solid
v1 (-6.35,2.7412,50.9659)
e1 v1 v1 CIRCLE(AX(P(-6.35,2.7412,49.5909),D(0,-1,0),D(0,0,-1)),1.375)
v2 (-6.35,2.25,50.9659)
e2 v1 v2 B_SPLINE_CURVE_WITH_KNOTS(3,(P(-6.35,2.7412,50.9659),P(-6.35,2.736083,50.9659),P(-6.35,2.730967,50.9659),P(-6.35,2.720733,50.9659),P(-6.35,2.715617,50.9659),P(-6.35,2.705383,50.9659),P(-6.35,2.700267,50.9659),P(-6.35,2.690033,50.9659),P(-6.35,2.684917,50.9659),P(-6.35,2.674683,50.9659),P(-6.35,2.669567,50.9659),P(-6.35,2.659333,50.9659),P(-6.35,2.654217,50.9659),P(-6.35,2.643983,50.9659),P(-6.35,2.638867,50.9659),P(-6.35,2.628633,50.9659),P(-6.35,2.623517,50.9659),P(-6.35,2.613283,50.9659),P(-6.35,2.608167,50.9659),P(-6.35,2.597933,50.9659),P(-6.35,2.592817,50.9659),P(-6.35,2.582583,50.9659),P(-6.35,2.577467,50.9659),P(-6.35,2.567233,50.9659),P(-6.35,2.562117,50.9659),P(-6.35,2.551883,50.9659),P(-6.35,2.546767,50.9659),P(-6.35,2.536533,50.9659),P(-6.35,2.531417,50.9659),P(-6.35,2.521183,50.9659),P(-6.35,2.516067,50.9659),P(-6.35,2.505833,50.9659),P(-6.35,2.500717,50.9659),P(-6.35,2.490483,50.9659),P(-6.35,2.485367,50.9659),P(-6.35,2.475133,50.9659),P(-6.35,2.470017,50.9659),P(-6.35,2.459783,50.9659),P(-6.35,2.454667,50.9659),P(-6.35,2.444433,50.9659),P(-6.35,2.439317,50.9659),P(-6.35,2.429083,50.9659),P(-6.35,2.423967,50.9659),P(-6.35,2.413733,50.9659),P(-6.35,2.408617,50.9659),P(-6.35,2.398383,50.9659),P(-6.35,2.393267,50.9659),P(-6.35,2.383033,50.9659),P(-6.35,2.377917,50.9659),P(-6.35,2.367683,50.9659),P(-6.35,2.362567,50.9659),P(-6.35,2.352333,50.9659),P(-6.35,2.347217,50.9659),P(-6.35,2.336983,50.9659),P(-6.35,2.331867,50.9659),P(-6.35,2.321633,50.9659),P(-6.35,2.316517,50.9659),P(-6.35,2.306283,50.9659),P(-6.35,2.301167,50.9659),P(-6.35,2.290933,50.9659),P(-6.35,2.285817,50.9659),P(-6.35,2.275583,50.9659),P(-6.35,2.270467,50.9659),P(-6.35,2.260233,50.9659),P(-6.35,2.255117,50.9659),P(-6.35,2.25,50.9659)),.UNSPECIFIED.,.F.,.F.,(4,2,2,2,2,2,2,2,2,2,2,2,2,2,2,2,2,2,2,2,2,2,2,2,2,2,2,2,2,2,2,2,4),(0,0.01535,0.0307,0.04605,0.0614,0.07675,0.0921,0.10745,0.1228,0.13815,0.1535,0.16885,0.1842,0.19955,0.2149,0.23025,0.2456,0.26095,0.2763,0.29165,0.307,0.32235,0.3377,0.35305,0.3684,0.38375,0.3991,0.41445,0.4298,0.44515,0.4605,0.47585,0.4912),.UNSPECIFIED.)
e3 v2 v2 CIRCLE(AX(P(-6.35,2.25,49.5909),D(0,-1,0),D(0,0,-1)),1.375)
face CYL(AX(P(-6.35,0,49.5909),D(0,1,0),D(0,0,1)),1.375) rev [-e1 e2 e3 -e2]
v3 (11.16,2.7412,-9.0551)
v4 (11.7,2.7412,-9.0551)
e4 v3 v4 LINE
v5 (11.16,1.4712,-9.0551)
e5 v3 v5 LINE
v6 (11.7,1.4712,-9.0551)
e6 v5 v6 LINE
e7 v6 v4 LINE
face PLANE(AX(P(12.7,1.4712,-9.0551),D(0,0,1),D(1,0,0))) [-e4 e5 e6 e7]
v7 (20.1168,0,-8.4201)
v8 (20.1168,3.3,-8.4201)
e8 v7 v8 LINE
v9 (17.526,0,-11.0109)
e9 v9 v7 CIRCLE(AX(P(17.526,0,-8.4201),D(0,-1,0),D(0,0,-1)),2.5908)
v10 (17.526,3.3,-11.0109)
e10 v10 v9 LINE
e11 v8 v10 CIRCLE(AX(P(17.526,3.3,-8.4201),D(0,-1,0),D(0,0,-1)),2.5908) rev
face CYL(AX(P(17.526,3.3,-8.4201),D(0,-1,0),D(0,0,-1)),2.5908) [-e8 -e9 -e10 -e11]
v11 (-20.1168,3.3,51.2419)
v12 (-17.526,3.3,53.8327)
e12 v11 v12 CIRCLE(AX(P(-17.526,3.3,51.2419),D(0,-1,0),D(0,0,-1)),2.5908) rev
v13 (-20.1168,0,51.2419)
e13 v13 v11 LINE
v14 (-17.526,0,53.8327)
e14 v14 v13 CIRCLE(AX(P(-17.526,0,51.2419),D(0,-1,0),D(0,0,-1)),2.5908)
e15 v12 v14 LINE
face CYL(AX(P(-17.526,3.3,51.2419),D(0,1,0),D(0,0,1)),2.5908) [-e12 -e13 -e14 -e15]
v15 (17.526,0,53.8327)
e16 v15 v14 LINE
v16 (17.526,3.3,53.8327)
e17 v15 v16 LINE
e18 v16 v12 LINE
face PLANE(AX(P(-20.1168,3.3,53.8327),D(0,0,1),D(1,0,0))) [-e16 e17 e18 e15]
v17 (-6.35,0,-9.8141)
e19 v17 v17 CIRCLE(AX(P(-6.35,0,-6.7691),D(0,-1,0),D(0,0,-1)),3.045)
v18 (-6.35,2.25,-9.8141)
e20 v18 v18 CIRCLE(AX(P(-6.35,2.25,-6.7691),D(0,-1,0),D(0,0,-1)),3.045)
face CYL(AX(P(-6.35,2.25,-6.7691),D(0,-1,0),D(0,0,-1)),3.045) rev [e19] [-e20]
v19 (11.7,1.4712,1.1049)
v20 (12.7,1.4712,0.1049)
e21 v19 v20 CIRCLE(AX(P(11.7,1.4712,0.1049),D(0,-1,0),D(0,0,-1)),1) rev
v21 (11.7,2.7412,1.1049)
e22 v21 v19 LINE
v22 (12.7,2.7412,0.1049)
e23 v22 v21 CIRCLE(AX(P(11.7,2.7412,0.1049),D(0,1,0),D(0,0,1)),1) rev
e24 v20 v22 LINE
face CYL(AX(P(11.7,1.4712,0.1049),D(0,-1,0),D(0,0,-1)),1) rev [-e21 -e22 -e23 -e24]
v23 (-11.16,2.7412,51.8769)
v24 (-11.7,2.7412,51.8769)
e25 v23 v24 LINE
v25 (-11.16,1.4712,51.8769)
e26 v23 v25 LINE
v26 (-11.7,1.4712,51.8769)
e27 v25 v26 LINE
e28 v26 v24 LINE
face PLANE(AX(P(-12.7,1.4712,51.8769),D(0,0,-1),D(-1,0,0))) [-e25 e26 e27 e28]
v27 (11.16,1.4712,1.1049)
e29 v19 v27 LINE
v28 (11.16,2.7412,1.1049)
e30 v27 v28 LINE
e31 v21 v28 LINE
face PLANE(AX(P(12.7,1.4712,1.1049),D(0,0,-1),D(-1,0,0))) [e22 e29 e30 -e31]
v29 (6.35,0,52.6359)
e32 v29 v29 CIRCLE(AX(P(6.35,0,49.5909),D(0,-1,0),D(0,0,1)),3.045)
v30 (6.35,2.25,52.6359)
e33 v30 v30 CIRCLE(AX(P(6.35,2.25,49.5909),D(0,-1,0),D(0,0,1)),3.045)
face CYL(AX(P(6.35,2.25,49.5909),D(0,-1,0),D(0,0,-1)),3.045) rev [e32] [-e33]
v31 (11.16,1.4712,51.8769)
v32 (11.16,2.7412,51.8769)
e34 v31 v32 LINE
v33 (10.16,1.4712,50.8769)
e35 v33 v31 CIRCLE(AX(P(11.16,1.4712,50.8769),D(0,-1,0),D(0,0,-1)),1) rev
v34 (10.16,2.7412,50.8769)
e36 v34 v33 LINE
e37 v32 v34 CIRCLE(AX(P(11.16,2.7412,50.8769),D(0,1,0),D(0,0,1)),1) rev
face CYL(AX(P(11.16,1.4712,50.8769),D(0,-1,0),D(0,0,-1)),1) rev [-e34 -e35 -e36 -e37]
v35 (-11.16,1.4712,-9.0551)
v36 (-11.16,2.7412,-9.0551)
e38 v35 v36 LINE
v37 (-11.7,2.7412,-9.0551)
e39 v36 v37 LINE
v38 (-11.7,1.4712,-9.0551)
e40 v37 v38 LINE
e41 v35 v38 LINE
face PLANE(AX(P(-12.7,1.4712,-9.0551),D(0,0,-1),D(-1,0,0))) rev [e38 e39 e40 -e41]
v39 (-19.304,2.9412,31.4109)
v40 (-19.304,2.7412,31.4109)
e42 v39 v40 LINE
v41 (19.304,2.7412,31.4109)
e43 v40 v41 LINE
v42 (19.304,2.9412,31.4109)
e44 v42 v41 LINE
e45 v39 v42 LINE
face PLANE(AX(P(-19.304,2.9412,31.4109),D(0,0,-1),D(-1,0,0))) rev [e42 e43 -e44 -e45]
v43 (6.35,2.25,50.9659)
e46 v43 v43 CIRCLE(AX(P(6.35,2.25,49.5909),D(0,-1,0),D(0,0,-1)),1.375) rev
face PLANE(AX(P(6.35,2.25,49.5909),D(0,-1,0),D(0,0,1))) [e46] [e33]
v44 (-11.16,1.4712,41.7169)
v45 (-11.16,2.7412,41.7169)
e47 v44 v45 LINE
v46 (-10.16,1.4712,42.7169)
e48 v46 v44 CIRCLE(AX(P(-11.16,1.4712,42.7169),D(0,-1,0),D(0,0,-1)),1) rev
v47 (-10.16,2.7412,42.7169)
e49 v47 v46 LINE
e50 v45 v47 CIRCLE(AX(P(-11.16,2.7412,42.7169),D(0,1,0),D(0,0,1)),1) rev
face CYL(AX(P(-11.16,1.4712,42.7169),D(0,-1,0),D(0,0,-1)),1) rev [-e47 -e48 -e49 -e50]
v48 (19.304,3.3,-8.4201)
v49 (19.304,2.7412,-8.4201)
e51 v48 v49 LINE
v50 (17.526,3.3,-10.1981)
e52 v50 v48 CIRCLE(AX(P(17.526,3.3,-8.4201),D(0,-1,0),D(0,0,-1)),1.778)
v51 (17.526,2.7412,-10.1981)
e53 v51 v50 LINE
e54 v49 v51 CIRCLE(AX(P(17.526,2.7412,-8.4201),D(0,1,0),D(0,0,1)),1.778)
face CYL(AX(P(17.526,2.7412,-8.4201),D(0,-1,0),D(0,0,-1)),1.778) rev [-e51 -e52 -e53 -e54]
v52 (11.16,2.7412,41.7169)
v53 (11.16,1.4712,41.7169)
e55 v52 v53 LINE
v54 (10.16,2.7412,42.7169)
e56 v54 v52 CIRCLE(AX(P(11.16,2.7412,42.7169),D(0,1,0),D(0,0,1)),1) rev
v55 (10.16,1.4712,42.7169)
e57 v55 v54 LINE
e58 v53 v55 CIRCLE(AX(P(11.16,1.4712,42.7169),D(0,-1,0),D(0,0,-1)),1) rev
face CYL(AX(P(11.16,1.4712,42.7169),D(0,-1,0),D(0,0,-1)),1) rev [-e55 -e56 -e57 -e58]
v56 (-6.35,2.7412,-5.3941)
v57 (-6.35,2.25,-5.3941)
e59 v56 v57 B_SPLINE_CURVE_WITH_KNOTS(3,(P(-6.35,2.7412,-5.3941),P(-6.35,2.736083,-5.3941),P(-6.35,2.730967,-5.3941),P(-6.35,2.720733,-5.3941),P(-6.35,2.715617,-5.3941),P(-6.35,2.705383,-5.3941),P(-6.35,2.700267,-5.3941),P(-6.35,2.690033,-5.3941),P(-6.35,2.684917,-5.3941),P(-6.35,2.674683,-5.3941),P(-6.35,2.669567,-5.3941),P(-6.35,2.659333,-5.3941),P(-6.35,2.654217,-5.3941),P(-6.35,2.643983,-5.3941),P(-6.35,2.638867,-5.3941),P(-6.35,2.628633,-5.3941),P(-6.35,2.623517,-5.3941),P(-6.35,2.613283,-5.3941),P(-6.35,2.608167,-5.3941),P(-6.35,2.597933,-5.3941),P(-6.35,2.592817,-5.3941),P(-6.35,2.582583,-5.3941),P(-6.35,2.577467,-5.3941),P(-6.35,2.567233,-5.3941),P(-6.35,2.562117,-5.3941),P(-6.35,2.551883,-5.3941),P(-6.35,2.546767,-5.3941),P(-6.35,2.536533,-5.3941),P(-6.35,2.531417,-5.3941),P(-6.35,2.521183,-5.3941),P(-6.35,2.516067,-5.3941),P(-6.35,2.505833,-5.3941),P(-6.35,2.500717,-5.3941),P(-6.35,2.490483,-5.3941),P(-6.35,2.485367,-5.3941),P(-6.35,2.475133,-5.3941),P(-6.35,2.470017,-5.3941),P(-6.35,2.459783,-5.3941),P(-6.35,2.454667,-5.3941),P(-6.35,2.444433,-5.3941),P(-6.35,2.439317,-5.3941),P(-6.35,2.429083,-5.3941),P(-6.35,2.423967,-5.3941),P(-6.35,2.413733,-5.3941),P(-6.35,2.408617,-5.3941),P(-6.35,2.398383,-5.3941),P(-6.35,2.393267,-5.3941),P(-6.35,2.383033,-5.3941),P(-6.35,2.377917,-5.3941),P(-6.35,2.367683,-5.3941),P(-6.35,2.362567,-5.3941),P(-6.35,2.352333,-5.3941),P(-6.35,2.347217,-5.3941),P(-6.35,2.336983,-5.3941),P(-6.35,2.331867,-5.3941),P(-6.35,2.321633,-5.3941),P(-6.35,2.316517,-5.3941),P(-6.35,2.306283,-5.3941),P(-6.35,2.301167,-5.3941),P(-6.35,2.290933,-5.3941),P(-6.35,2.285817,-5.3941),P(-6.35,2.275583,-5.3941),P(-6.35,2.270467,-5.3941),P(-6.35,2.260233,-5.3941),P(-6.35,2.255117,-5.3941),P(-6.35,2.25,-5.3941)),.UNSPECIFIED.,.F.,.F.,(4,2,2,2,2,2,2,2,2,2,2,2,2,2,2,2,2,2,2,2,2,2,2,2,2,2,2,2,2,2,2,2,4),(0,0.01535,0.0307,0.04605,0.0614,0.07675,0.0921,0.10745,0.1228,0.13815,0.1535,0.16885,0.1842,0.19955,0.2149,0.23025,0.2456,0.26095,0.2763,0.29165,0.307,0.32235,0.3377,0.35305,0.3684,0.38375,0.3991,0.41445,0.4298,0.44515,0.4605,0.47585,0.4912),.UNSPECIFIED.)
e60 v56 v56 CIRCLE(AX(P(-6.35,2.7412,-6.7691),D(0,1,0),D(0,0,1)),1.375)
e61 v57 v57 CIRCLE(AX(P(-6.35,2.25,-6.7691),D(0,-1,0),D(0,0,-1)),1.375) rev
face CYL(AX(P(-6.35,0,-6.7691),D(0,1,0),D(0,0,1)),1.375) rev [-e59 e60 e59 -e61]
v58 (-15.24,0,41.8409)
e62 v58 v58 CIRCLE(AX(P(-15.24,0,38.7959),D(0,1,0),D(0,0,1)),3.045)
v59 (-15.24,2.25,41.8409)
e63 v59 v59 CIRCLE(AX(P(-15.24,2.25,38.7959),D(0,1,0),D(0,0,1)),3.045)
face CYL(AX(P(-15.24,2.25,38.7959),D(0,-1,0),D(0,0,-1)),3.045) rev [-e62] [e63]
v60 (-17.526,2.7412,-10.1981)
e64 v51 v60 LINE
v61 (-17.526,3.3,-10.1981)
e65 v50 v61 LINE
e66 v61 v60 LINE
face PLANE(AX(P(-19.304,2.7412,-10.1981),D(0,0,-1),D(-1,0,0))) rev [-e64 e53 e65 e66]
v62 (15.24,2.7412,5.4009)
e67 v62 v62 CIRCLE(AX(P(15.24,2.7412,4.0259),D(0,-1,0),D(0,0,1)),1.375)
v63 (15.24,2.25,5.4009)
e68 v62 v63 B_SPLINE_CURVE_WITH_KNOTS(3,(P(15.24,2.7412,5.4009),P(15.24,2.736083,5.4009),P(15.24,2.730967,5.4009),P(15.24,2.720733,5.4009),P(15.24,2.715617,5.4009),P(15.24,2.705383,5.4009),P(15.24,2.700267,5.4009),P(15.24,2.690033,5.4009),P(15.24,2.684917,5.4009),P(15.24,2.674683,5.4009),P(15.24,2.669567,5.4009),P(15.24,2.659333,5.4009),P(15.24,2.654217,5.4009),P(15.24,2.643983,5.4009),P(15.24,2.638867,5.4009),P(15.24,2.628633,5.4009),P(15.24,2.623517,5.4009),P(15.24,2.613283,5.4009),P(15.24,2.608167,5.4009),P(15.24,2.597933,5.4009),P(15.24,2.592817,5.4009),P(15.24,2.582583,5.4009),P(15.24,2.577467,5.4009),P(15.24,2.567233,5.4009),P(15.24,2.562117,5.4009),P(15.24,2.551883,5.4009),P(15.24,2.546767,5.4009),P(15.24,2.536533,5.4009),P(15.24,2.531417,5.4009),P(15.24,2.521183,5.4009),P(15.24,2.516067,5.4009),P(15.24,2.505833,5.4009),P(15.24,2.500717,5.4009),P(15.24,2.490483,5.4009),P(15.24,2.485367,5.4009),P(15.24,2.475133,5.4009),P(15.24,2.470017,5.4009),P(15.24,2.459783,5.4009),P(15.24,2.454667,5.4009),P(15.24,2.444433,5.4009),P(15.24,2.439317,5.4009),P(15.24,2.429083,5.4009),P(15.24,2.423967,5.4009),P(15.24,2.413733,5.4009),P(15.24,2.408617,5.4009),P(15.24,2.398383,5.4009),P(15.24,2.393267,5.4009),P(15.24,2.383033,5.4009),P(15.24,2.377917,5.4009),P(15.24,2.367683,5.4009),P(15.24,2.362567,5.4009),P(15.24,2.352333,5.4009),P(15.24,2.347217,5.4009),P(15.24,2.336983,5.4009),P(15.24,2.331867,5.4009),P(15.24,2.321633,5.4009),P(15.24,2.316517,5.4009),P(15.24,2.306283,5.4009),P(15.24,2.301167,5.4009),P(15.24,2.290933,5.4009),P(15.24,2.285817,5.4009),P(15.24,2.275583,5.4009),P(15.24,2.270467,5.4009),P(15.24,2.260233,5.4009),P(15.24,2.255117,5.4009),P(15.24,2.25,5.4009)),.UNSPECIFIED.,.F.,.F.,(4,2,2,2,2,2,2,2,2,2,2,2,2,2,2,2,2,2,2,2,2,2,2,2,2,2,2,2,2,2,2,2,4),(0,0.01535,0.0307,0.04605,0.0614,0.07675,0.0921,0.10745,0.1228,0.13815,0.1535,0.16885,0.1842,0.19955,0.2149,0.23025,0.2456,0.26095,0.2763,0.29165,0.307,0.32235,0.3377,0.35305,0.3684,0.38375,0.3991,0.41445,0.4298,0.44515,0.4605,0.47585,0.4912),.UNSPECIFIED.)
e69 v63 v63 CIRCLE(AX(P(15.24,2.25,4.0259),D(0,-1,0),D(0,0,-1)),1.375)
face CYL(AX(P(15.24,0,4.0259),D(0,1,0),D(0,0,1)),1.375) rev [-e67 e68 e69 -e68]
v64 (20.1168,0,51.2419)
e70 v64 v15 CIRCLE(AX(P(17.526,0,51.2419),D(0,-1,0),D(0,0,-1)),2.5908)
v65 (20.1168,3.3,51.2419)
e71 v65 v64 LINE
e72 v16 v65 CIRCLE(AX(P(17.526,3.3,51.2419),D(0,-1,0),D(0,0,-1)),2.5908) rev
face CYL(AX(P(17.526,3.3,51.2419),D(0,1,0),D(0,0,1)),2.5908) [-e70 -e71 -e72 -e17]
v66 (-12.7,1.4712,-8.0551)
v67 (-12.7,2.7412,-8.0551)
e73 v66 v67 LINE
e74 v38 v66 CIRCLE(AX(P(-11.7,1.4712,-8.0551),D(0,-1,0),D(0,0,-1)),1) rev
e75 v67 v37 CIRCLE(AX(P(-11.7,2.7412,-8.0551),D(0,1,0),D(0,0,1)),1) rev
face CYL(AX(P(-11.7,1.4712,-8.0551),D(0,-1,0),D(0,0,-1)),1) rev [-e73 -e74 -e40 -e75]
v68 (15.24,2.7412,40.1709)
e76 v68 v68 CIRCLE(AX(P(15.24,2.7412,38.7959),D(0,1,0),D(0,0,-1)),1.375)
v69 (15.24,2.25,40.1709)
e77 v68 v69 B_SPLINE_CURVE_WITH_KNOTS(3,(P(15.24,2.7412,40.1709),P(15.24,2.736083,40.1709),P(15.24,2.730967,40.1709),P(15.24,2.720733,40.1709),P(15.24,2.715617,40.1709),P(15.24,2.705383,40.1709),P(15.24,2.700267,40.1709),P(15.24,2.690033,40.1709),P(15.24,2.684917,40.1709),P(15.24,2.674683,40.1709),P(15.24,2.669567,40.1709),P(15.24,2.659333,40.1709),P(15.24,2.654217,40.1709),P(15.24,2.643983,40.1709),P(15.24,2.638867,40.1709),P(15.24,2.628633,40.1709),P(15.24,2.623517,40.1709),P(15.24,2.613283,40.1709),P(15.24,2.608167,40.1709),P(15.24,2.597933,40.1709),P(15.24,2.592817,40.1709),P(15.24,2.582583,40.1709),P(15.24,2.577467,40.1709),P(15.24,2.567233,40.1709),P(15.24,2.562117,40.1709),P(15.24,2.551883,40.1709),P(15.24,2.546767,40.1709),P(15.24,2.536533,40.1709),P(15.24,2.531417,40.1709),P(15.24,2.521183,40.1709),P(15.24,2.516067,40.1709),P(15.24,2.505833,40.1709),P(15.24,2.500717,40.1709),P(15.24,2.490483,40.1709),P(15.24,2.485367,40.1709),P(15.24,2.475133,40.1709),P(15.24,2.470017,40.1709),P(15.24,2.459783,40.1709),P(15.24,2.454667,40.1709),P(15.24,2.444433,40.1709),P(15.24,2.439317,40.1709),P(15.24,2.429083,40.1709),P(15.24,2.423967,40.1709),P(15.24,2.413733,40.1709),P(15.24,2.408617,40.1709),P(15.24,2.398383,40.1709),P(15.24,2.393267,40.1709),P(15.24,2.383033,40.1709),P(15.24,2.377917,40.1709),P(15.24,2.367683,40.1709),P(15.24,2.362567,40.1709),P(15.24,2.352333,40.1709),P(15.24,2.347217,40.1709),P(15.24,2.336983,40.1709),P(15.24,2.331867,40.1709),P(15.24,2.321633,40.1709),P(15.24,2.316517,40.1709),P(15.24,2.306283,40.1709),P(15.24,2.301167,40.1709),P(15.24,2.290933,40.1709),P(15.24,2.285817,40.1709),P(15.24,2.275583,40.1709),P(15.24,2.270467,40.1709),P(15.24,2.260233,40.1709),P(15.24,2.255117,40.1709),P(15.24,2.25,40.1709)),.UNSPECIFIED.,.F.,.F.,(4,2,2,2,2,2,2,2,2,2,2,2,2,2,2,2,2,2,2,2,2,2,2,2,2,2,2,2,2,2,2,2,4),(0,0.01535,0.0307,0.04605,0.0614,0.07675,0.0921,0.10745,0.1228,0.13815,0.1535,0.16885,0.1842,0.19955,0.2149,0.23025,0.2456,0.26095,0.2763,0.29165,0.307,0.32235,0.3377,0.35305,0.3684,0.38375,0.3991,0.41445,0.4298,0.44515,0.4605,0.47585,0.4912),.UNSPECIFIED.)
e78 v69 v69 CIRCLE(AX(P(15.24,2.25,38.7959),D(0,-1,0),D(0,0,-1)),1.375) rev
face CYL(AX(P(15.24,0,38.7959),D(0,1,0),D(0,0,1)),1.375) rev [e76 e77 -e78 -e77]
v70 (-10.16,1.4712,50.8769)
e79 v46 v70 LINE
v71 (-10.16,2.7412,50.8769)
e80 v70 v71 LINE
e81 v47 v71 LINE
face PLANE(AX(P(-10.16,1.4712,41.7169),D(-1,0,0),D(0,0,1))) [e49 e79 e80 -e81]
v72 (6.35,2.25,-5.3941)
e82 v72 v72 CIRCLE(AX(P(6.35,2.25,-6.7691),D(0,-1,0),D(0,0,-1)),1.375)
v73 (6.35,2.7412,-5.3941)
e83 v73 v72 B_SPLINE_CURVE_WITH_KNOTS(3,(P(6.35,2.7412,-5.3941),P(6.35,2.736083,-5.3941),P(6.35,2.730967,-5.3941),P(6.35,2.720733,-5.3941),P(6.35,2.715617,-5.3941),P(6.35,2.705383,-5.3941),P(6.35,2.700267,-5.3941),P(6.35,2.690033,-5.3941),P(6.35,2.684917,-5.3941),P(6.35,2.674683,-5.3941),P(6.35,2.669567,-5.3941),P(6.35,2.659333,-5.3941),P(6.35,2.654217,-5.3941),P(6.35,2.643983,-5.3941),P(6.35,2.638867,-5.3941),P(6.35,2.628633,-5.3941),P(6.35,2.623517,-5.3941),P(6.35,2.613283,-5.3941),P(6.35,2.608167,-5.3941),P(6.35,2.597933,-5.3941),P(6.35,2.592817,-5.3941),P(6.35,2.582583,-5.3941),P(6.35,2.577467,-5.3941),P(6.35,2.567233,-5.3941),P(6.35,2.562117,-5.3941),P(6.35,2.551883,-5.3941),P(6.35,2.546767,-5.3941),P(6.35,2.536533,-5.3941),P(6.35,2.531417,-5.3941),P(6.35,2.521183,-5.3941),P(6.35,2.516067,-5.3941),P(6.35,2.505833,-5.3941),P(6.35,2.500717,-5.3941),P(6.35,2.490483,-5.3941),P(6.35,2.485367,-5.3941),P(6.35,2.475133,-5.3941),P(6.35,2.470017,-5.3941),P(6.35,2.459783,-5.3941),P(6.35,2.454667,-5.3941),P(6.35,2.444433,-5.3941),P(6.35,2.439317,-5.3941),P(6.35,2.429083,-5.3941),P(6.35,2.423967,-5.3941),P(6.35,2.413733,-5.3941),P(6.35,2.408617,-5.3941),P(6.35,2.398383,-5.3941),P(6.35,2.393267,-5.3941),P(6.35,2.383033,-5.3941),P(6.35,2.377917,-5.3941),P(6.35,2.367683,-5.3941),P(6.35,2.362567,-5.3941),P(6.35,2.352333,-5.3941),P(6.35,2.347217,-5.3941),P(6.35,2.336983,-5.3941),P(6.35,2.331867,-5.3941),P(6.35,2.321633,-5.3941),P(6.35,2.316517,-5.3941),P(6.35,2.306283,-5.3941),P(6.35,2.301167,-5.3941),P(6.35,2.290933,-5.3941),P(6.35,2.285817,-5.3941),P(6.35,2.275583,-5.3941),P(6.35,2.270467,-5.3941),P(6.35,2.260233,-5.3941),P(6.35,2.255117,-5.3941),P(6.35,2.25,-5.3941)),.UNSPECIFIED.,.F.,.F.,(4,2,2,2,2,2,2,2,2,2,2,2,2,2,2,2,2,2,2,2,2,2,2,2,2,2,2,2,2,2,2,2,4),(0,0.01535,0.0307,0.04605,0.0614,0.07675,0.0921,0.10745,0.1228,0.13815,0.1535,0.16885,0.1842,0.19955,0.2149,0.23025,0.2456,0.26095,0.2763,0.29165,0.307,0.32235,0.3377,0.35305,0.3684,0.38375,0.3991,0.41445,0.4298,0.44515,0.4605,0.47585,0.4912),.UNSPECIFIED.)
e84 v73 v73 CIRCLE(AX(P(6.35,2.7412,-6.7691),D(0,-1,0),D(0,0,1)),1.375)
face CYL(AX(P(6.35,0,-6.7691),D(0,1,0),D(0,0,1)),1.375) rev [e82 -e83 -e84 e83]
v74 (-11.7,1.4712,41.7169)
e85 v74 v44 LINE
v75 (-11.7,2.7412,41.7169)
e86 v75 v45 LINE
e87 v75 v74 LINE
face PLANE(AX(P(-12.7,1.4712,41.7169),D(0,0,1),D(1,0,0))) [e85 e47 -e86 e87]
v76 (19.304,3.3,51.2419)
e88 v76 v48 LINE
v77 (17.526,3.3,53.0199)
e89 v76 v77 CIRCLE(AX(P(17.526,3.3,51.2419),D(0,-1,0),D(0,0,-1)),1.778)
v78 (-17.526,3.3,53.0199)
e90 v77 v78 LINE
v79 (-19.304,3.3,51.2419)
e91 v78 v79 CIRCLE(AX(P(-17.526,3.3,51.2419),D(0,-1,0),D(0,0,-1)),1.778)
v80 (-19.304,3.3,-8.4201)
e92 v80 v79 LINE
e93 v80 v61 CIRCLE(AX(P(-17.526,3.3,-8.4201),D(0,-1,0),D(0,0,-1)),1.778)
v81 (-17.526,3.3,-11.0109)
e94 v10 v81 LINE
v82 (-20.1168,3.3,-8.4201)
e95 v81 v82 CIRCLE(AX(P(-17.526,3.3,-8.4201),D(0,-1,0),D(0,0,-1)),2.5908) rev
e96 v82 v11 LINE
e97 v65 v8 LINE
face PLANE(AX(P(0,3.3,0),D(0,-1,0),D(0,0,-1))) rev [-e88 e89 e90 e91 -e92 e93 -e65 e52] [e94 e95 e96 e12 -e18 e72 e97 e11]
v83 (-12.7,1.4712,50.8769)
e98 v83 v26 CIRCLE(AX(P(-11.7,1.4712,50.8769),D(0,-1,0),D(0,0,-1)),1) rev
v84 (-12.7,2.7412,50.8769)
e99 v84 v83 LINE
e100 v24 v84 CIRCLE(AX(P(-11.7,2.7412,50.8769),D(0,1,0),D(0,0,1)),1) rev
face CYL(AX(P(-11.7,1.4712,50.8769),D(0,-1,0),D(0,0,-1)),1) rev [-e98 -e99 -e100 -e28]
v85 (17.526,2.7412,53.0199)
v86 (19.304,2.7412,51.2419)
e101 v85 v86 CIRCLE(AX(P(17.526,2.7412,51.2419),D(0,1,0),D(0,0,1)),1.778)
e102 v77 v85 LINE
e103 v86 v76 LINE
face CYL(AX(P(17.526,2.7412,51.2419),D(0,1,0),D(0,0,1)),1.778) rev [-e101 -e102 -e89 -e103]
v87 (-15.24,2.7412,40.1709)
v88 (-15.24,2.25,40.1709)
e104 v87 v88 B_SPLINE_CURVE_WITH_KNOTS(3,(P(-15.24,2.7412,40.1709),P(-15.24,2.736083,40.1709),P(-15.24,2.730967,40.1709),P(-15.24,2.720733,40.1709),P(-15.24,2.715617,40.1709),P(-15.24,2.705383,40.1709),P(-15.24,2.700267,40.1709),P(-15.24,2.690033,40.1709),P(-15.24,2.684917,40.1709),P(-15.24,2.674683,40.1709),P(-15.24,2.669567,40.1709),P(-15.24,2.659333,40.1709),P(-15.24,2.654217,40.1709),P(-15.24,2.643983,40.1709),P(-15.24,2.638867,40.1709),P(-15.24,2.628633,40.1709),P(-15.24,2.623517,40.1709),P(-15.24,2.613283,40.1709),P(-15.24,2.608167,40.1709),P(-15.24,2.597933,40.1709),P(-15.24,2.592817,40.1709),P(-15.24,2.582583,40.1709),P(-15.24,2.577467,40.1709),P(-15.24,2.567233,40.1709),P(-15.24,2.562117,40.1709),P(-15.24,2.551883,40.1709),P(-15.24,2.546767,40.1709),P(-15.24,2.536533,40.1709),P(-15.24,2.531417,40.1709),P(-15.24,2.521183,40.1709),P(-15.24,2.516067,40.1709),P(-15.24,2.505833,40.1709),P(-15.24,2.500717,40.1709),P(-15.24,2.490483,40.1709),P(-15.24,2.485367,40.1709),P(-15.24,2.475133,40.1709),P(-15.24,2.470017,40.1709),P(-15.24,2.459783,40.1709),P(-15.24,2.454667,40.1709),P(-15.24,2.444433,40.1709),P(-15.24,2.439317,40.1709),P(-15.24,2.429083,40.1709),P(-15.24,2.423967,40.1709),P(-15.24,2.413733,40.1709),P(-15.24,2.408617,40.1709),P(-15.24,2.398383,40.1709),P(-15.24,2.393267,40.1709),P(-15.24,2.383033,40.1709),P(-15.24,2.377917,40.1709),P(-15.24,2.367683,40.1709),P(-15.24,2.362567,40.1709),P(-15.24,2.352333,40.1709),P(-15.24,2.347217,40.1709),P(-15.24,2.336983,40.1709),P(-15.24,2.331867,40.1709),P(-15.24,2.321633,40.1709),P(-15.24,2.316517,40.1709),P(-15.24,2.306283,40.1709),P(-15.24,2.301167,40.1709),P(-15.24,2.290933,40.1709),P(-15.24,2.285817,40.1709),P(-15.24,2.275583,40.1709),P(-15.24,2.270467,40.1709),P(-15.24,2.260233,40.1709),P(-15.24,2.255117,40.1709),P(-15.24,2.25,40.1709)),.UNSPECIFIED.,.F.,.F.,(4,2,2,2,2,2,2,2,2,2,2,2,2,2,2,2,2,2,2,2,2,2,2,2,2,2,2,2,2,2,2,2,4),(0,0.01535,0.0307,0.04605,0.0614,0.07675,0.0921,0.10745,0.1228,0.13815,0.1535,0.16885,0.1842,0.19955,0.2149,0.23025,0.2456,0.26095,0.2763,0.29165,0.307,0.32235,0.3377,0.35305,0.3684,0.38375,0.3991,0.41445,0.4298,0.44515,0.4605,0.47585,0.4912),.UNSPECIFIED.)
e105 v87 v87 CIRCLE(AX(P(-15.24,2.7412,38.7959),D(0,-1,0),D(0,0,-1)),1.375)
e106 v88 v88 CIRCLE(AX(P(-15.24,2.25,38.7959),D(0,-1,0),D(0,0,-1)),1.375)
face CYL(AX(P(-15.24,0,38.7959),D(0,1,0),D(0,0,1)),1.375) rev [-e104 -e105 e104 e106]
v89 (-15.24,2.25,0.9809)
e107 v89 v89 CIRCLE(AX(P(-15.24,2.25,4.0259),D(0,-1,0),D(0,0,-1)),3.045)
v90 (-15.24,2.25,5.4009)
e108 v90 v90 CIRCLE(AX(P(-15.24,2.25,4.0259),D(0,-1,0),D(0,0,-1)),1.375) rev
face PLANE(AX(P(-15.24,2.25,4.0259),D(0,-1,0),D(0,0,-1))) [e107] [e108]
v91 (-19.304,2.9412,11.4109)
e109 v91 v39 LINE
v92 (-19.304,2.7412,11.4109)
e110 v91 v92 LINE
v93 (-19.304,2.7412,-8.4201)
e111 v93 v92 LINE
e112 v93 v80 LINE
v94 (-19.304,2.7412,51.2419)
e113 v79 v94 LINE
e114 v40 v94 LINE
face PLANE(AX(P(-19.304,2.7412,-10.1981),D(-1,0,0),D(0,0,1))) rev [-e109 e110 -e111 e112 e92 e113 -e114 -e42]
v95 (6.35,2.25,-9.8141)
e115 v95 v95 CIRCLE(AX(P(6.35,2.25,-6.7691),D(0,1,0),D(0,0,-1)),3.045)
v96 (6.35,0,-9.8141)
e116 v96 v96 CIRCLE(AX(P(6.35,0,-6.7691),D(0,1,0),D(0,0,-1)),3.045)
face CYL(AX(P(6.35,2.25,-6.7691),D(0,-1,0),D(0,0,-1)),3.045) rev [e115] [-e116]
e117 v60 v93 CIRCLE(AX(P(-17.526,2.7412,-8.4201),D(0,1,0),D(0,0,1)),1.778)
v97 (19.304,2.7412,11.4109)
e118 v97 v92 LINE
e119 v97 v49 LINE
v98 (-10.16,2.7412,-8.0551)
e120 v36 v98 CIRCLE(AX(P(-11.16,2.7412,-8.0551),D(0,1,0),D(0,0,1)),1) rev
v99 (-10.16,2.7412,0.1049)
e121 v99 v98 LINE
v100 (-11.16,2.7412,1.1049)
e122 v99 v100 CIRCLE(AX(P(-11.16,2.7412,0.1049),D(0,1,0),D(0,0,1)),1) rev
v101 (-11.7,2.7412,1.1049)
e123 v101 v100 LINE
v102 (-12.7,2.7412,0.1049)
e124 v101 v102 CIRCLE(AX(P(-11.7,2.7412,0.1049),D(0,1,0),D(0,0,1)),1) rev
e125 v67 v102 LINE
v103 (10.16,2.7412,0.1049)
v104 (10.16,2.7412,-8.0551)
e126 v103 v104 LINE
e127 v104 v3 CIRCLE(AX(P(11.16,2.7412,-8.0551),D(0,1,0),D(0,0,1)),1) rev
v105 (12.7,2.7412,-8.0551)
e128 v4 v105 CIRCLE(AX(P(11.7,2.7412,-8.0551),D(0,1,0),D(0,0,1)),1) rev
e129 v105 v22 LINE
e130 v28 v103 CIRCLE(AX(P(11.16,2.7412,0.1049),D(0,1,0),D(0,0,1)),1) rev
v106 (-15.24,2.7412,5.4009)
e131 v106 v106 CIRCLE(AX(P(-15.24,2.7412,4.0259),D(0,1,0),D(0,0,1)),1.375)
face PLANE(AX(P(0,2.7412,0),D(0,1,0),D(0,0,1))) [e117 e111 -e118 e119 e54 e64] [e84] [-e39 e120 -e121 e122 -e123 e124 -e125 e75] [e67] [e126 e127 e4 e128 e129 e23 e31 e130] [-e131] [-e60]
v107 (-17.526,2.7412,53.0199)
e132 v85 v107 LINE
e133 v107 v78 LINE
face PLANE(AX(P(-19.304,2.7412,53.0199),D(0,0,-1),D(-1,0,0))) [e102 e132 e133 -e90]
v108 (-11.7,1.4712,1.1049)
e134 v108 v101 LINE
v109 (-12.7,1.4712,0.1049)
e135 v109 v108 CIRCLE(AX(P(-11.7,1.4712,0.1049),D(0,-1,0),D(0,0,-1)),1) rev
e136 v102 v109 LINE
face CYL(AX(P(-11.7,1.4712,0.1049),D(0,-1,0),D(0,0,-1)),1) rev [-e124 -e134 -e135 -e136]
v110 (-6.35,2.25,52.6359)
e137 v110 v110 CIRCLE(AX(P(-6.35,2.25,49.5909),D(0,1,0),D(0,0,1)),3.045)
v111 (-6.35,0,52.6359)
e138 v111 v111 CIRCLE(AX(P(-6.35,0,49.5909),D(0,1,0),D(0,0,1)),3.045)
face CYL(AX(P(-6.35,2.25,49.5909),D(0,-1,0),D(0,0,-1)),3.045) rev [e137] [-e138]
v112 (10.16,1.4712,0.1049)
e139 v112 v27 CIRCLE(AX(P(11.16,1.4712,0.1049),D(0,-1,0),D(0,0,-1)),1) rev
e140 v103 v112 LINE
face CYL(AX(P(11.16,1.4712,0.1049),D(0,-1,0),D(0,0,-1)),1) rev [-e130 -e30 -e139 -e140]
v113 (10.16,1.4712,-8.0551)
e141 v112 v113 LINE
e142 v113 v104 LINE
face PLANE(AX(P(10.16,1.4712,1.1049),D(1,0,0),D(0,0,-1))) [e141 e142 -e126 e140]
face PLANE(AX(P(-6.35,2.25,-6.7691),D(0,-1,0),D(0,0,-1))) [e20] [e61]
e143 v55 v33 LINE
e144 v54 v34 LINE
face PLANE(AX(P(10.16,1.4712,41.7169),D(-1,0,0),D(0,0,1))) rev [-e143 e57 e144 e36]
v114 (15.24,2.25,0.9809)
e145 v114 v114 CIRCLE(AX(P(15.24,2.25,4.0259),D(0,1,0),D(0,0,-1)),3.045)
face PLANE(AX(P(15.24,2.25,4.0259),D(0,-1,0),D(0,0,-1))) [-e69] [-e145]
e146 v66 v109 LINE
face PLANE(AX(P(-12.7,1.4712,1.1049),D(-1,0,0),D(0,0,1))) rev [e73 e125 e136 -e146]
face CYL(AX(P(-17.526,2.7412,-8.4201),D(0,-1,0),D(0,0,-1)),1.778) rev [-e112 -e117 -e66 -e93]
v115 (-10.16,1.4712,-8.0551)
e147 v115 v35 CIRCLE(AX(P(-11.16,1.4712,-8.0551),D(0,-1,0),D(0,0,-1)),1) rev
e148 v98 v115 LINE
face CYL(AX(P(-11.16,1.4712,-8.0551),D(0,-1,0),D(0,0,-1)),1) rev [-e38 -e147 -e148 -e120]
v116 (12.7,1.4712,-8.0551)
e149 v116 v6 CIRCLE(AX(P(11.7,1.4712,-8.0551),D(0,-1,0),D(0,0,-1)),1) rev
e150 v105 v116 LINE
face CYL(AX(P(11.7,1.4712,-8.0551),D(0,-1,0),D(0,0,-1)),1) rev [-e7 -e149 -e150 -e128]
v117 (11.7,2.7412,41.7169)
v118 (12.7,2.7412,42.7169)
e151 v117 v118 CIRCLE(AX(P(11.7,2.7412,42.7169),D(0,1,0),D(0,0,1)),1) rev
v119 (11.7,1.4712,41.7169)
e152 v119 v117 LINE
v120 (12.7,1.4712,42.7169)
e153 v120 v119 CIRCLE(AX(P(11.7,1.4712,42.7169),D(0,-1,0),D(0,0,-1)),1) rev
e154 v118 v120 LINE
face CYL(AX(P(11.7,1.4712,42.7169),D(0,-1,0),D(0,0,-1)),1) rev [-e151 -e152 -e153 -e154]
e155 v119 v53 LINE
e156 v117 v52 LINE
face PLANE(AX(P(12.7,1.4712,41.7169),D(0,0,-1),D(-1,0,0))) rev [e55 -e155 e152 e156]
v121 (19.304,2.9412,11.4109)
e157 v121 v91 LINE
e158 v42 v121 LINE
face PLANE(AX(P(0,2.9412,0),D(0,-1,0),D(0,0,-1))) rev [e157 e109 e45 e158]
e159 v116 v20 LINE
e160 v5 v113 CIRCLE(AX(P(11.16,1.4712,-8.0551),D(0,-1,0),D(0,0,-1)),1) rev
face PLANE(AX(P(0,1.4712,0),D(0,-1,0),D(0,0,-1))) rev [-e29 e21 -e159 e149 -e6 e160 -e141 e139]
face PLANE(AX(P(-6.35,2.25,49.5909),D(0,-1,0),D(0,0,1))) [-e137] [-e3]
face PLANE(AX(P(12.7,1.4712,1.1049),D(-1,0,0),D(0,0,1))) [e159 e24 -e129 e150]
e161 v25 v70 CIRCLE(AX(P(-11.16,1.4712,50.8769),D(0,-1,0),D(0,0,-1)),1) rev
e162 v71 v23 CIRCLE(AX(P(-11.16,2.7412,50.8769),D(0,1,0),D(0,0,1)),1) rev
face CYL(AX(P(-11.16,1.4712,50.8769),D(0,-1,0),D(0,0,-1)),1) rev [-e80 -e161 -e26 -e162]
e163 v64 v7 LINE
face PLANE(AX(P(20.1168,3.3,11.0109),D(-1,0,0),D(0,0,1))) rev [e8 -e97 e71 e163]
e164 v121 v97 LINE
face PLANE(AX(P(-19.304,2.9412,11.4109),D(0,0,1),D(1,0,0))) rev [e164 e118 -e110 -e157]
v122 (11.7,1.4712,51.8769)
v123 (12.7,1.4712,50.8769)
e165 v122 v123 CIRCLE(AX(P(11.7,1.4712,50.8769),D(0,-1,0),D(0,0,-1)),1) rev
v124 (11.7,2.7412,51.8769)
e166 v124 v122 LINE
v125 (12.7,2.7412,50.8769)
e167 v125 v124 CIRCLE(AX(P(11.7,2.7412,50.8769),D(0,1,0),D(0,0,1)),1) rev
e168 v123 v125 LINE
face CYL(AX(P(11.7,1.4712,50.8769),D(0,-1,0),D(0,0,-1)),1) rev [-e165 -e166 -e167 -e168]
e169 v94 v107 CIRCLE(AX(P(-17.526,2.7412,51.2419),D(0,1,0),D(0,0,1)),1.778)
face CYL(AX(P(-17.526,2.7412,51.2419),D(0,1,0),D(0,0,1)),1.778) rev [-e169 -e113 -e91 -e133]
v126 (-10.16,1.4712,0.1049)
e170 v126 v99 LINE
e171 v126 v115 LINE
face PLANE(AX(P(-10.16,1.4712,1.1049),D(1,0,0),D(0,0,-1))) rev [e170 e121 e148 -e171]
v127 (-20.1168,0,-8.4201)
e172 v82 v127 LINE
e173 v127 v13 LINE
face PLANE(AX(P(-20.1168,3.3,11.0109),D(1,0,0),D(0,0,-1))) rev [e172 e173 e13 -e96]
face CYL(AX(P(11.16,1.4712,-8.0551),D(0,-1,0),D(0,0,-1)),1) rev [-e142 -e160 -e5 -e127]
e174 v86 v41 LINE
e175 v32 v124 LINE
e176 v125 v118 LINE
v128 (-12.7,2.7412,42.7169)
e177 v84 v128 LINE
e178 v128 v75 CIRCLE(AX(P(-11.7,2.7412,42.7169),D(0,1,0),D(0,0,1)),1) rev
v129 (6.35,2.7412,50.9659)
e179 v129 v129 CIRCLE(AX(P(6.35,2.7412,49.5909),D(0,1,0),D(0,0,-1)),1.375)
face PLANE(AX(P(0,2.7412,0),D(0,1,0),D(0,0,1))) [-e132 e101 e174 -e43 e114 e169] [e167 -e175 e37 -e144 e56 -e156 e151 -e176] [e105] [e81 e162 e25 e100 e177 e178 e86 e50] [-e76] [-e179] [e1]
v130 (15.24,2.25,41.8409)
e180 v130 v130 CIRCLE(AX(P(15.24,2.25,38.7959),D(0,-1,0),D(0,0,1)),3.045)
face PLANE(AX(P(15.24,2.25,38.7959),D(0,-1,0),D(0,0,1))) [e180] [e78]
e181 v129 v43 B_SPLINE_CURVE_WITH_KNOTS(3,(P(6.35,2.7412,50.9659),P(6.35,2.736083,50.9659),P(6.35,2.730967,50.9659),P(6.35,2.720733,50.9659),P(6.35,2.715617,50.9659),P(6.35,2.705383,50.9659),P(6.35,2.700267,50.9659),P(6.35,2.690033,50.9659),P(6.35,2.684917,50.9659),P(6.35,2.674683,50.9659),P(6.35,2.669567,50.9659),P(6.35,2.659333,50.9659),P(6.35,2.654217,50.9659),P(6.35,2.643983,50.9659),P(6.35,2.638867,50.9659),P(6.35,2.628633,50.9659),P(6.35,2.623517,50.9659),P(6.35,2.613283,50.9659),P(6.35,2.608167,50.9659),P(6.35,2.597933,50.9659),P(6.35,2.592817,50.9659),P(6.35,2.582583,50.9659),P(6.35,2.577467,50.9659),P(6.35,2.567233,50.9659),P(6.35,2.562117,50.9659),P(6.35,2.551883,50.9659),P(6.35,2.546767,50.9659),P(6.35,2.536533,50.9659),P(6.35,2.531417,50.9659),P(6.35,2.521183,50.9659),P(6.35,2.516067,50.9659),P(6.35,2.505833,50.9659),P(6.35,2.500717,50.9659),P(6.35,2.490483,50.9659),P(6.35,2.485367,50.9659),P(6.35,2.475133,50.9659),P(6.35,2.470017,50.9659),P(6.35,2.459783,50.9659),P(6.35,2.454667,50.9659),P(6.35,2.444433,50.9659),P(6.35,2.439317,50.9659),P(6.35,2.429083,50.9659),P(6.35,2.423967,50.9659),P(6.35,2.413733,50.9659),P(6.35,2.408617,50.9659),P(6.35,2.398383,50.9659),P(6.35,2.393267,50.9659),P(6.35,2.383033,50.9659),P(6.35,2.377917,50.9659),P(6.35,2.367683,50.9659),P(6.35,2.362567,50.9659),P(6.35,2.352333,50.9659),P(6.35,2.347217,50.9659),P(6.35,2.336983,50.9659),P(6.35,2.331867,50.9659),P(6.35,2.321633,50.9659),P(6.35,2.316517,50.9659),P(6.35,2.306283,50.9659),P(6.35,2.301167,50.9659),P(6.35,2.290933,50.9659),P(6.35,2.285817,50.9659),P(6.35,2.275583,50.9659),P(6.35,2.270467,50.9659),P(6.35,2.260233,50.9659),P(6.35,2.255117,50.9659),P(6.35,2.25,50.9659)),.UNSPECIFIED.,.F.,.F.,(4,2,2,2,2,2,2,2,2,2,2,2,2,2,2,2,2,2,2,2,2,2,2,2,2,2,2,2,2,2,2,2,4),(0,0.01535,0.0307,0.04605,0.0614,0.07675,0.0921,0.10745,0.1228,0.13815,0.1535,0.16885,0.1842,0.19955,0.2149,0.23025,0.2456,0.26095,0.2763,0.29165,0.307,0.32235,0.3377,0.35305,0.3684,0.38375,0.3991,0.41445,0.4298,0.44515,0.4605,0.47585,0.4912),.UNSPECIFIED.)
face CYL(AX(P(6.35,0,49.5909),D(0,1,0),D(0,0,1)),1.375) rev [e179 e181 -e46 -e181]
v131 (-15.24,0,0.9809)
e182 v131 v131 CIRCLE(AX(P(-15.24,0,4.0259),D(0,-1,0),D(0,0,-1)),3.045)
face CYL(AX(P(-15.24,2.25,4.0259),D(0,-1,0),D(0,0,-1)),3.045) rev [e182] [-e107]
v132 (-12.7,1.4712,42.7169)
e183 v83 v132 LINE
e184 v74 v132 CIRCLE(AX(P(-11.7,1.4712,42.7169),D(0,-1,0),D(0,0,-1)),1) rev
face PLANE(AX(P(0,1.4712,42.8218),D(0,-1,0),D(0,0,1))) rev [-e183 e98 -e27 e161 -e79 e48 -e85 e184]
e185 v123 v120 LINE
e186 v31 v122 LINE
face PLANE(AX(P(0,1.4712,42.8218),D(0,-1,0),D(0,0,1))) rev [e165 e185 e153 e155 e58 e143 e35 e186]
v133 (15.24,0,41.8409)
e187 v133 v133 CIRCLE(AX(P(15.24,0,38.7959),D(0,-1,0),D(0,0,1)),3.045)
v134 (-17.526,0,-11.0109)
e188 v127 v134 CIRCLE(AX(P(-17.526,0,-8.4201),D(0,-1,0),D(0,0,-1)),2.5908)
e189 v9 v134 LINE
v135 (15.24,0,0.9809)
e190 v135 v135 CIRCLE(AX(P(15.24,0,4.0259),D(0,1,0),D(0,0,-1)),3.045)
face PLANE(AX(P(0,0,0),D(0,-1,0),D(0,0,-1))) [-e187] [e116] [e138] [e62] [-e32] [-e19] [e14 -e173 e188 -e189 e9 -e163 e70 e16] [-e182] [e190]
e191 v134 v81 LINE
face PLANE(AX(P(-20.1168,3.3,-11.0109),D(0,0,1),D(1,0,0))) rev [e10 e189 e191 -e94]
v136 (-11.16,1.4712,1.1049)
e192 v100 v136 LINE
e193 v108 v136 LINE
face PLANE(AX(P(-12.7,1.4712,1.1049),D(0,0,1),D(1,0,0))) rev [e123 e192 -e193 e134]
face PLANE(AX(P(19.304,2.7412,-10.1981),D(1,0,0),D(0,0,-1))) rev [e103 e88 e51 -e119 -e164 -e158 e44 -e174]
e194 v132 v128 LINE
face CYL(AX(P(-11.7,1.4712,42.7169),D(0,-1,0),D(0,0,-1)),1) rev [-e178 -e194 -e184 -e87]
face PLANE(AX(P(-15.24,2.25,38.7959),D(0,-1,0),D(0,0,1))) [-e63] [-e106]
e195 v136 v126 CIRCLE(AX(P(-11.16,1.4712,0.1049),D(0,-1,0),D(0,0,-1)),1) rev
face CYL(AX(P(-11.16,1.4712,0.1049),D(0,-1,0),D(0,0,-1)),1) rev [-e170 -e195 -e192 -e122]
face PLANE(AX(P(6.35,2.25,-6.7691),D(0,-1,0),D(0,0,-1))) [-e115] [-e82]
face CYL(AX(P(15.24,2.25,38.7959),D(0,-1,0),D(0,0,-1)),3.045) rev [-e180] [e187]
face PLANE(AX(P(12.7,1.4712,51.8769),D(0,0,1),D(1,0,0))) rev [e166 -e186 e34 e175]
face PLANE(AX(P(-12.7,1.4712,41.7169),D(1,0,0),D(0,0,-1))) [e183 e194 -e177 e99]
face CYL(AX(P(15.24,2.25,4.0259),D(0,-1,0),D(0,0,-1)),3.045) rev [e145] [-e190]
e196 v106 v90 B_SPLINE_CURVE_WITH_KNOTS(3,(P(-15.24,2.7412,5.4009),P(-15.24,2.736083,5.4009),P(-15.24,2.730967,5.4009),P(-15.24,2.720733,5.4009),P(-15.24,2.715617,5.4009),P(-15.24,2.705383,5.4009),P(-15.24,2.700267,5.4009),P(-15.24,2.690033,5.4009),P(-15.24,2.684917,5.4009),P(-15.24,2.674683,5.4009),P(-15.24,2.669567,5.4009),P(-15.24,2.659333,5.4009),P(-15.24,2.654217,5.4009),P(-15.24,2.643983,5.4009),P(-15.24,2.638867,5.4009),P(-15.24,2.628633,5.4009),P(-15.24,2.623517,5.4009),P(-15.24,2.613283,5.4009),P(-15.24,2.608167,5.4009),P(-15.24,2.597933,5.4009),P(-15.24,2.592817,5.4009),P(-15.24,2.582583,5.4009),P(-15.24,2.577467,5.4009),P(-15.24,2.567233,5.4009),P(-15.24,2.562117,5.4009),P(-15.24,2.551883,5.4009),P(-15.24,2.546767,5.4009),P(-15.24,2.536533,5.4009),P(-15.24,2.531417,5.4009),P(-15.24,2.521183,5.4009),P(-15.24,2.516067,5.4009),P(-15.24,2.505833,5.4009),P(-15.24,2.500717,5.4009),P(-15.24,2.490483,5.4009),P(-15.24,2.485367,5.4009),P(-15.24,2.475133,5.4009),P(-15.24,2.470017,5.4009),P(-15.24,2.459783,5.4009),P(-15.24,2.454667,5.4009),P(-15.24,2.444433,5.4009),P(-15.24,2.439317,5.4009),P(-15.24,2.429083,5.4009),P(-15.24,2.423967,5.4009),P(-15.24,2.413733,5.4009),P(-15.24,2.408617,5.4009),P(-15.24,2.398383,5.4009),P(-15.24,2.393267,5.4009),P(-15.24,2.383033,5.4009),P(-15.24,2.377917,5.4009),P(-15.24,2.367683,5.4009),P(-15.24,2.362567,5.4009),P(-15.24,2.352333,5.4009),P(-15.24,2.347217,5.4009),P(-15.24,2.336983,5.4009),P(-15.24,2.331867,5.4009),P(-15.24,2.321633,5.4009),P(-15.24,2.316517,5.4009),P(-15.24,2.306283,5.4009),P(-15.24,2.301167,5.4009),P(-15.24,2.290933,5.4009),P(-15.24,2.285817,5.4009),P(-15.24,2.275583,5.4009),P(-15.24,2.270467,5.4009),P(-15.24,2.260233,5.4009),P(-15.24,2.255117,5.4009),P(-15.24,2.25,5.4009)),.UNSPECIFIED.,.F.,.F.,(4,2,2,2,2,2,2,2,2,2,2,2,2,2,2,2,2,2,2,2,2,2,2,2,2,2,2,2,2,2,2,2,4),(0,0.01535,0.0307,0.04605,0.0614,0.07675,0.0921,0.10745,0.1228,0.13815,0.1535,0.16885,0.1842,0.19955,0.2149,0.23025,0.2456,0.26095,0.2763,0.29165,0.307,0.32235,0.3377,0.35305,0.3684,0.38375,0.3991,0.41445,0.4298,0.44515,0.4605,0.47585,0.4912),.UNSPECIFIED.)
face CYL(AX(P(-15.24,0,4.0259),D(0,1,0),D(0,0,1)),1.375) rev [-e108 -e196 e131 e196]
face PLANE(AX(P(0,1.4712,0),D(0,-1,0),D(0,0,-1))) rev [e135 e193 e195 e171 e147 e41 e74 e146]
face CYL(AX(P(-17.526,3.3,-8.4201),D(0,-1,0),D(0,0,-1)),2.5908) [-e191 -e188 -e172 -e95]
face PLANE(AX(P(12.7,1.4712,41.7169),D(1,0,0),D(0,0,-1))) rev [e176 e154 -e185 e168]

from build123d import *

# Parameters (mm, degrees)
SKETCH1_W             = 40.2336
SKETCH1_H             = 22.0218
BOSS_EXTRUDE1_DEPTH   = 3.3
FILLET1_R             = 2.5908
SKETCH3_W             = 38.608
SKETCH3_H             = 21.209
CUT_EXTRUDE1_DEPTH    = 0.5588
FILLET2_R             = 1.778
SKETCH4_R             = 1.375
CUT_EXTRUDE2_DEPTH    = 24.096314392
SKETCH5_R             = 3.045
CUT_EXTRUDE3_DEPTH    = 2.25
SKETCH6_W             = 2.54
SKETCH6_H             = 10.16
CUT_EXTRUDE4_DEPTH    = 1.27
FILLET3_R             = 1
FILLET3_OF_MIRROR3_R  = 1
BOSS_EXTRUDE2_DEPTH   = 20.8
SKETCH9_W             = 38.608
SKETCH9_H             = 20
BOSS_EXTRUDE3_DEPTH   = 0.2
MIRROR4_OUTLINE_R     = 3.045
MIRROR4_DEPTH         = 2.7412
MIRROR4_2_DEPTH       = 1.4712
MIRROR4_START         = 2.25
MIRROR4_3_OUTLINE_R   = 3.045
MIRROR4_3_OUTLINE_R_2 = 1.375
MIRROR4_3_DEPTH       = 0.4912
MIRROR4_START_2       = 2.7412
MIRROR4_4_DEPTH       = 0.5588


# Read off the part's stored shape, not the designer's step: Mirror4
with BuildPart() as part:
    # Sketch1 → Boss-Extrude1 (new body)
    with BuildSketch(Plane(origin=(0, 0, 0), x_dir=(1, 0, 0), z_dir=(0, 1, 0))):
        Rectangle(SKETCH1_W, SKETCH1_H)
    extrude(amount=BOSS_EXTRUDE1_DEPTH)

    # Fillet1
    fillet1_edges = [part.edges().sort_by_distance(p)[0] for p in [
        (-20.1168, 1.65, -11.0109),
        (20.1168, 1.65, -11.0109),
    ]]
    fillet(fillet1_edges, radius=FILLET1_R)

    # Sketch3 → Cut-Extrude1 (cut)
    with BuildSketch(Plane(origin=(0, 3.3, 0), x_dir=(1, 0, 0), z_dir=(0, 1, 0))):
        with Locations((0, -0.4064)):
            Rectangle(SKETCH3_W, SKETCH3_H)
    extrude(amount=-CUT_EXTRUDE1_DEPTH, mode=Mode.SUBTRACT)

    # Fillet2
    fillet2_edges = [part.edges().sort_by_distance(p)[0] for p in [
        (19.304, 3.0206, -10.1981),
        (-19.304, 3.0206, -10.1981),
    ]]
    fillet(fillet2_edges, radius=FILLET2_R)

    # Sketch4 → Cut-Extrude2 (cut, through all)
    with BuildSketch(Plane(origin=(0, 2.7412, 0), x_dir=(1, 0, 0), z_dir=(0, 1, 0))):
        with Locations(Location((-6.35, 6.7691, 0), (0, 0, 270))):
            Circle(SKETCH4_R)
        with Locations(Location((-15.24, -4.0259, 0), (0, 0, 270))):
            Circle(SKETCH4_R)
    cut_extrude2 = extrude(amount=-CUT_EXTRUDE2_DEPTH, mode=Mode.SUBTRACT)

    # Mirror1: Cut-Extrude2 across plane
    add(cut_extrude2.mirror(Plane(origin=(0, 0, 0), x_dir=(0, 0, 1), z_dir=(1, 0, 0))), mode=Mode.SUBTRACT)

    # Sketch5 → Cut-Extrude3 (cut)
    with BuildSketch(Plane.XZ):
        with Locations(Location((-15.24, 4.0259, 0), (0, 0, 270))):
            Circle(SKETCH5_R)
        with Locations(Location((-6.35, -6.7691, 0), (0, 0, 270))):
            Circle(SKETCH5_R)
    cut_extrude3 = extrude(amount=-CUT_EXTRUDE3_DEPTH, mode=Mode.SUBTRACT)

    # Mirror2: Cut-Extrude3 across plane
    add(cut_extrude3.mirror(Plane(origin=(0, 0, 0), x_dir=(0, 0, 1), z_dir=(1, 0, 0))), mode=Mode.SUBTRACT)

    # Sketch6 → Cut-Extrude4 (cut)
    with BuildSketch(Plane(origin=(0, 2.7412, 0), x_dir=(1, 0, 0), z_dir=(0, 1, 0))):
        with Locations((-11.43, 3.9751)):
            Rectangle(SKETCH6_W, SKETCH6_H)
    cut_extrude4 = extrude(amount=-CUT_EXTRUDE4_DEPTH, mode=Mode.SUBTRACT)

    # Fillet3
    fillet3_edges = [part.edges().sort_by_distance(p)[0] for p in [
        (-10.16, 2.1062, -9.0551),
        (-10.16, 2.1062, 1.1049),
        (-12.7, 2.1062, 1.1049),
        (-12.7, 2.1062, -9.0551),
    ]]
    fillet(fillet3_edges, radius=FILLET3_R)

    # Mirror3: Cut-Extrude4 across plane
    add(cut_extrude4.mirror(Plane(origin=(0, 0, 0), x_dir=(0, 0, 1), z_dir=(1, 0, 0))), mode=Mode.SUBTRACT)

    # Fillet3 of Mirror3
    fillet3_of_mirror3_edges = [part.edges().sort_by_distance(p)[0] for p in [
        (10.16, 2.1062, -9.0551),
        (10.16, 2.1062, 1.1049),
        (12.7, 2.1062, 1.1049),
        (12.7, 2.1062, -9.0551),
    ]]
    fillet(fillet3_of_mirror3_edges, radius=FILLET3_OF_MIRROR3_R)

    # Sketch8 → Boss-Extrude2 (add)
    with BuildSketch(Plane.XY.offset(11.0109)):
        Polygon((-20.1168, 0), (-20.1168, 3.3), (-19.304, 3.3), (-19.304, 2.7412), (19.304, 2.7412), (19.304, 3.3), (20.1168, 3.3), (20.1168, 0), align=None)
    extrude(amount=BOSS_EXTRUDE2_DEPTH)

    # Sketch9 → Boss-Extrude3 (add)
    with BuildSketch(Plane(origin=(0, 2.7412, 0), x_dir=(1, 0, 0), z_dir=(0, 1, 0))):
        with Locations((0, -21.4109)):
            Rectangle(SKETCH9_W, SKETCH9_H)
    extrude(amount=BOSS_EXTRUDE3_DEPTH)

    # Mirror4 outline → Mirror4 (add)
    with BuildSketch(Plane(origin=(0, 0, 0), x_dir=(1, 0, 0), z_dir=(0, 1, 0))):
        with BuildLine():
            Line((-20.1168, -31.8109), (-20.1168, -51.241899868))
            ThreePointArc((-20.1168, -51.241899868), (-19.357972249, -53.073872117), (-17.526, -53.832699868))
            Line((-17.526, -53.832699868), (17.526, -53.832699868))
            ThreePointArc((17.526, -53.832699868), (19.357972249, -53.073872117), (20.1168, -51.241899868))
            Line((20.1168, -51.241899868), (20.1168, -31.8109))
            Line((20.1168, -31.8109), (-20.1168, -31.8109))
        make_face()
        with Locations((-6.35, -49.590899868)):
            Circle(MIRROR4_OUTLINE_R, mode=Mode.SUBTRACT)
        with BuildLine():
            ThreePointArc((-11.16, -41.716899868), (-10.452893219, -42.009793087), (-10.16, -42.716899868))
            Line((-10.16, -42.716899868), (-10.16, -50.876899868))
            ThreePointArc((-10.16, -50.876899868), (-10.452893219, -51.584006649), (-11.16, -51.876899868))
            Line((-11.16, -51.876899868), (-11.7, -51.876899868))
            ThreePointArc((-11.7, -51.876899868), (-12.407106781, -51.584006649), (-12.7, -50.876899868))
            Line((-12.7, -50.876899868), (-12.7, -42.716899868))
            ThreePointArc((-12.7, -42.716899868), (-12.407106781, -42.009793087), (-11.7, -41.716899868))
            Line((-11.7, -41.716899868), (-11.16, -41.716899868))
        make_face(mode=Mode.SUBTRACT)
        with Locations((6.35, -49.590899868)):
            Circle(MIRROR4_OUTLINE_R, mode=Mode.SUBTRACT)
        with BuildLine():
            Line((10.16, -50.876899868), (10.16, -42.716899868))
            ThreePointArc((10.16, -42.716899868), (10.452893219, -42.009793087), (11.16, -41.716899868))
            Line((11.16, -41.716899868), (11.7, -41.716899868))
            ThreePointArc((11.7, -41.716899868), (12.407106781, -42.009793087), (12.7, -42.716899868))
            Line((12.7, -42.716899868), (12.7, -50.876899868))
            ThreePointArc((12.7, -50.876899868), (12.407106781, -51.584006649), (11.7, -51.876899868))
            Line((11.7, -51.876899868), (11.16, -51.876899868))
            ThreePointArc((11.16, -51.876899868), (10.452893219, -51.584006649), (10.16, -50.876899868))
        make_face(mode=Mode.SUBTRACT)
        with Locations((-15.24, -38.795899868)):
            Circle(MIRROR4_OUTLINE_R, mode=Mode.SUBTRACT)
        with Locations((15.24, -38.795899868)):
            Circle(MIRROR4_OUTLINE_R, mode=Mode.SUBTRACT)
    extrude(amount=MIRROR4_DEPTH)

    # Mirror4 2 outline → Mirror4 2 (add)
    with BuildSketch(Plane(origin=(0, 0, 0), x_dir=(1, 0, 0), z_dir=(0, 1, 0))):
        with BuildLine():
            Line((-10.16, -50.876899868), (-10.16, -42.716899868))
            ThreePointArc((-10.16, -42.716899868), (-10.452893219, -42.009793087), (-11.16, -41.716899868))
            Line((-11.16, -41.716899868), (-11.7, -41.716899868))
            ThreePointArc((-11.7, -41.716899868), (-12.407106781, -42.009793087), (-12.7, -42.716899868))
            Line((-12.7, -42.716899868), (-12.7, -50.876899868))
            ThreePointArc((-12.7, -50.876899868), (-12.407106781, -51.584006649), (-11.7, -51.876899868))
            Line((-11.7, -51.876899868), (-11.16, -51.876899868))
            ThreePointArc((-11.16, -51.876899868), (-10.452893219, -51.584006649), (-10.16, -50.876899868))
        make_face()
        with BuildLine():
            ThreePointArc((11.16, -41.716899868), (10.452893219, -42.009793087), (10.16, -42.716899868))
            Line((10.16, -42.716899868), (10.16, -50.876899868))
            ThreePointArc((10.16, -50.876899868), (10.452893219, -51.584006649), (11.16, -51.876899868))
            Line((11.16, -51.876899868), (11.7, -51.876899868))
            ThreePointArc((11.7, -51.876899868), (12.407106781, -51.584006649), (12.7, -50.876899868))
            Line((12.7, -50.876899868), (12.7, -42.716899868))
            ThreePointArc((12.7, -42.716899868), (12.407106781, -42.009793087), (11.7, -41.716899868))
            Line((11.7, -41.716899868), (11.16, -41.716899868))
        make_face()
    extrude(amount=MIRROR4_2_DEPTH)

    # Mirror4 3 outline → Mirror4 3 (add)
    # profile 1 of 4: a face of its own
    with BuildSketch(Plane(origin=(0, 0, 0), x_dir=(1, 0, 0), z_dir=(0, 1, 0)).offset(MIRROR4_START)):
        with Locations((-6.35, -49.590899868)):
            Circle(MIRROR4_3_OUTLINE_R)
        with Locations((-6.35, -49.590899868)):
            Circle(MIRROR4_3_OUTLINE_R_2, mode=Mode.SUBTRACT)
    # profile 2 of 4: a face of its own
    with BuildSketch(Plane(origin=(0, 0, 0), x_dir=(1, 0, 0), z_dir=(0, 1, 0)).offset(MIRROR4_START)):
        with Locations((-15.24, -38.795899868)):
            Circle(MIRROR4_3_OUTLINE_R)
        with Locations((-15.24, -38.795899868)):
            Circle(MIRROR4_3_OUTLINE_R_2, mode=Mode.SUBTRACT)
    # profile 3 of 4: a face of its own
    with BuildSketch(Plane(origin=(0, 0, 0), x_dir=(1, 0, 0), z_dir=(0, 1, 0)).offset(MIRROR4_START)):
        with Locations((6.35, -49.590899868)):
            Circle(MIRROR4_3_OUTLINE_R)
        with Locations((6.35, -49.590899868)):
            Circle(MIRROR4_3_OUTLINE_R_2, mode=Mode.SUBTRACT)
    # profile 4 of 4: a face of its own
    with BuildSketch(Plane(origin=(0, 0, 0), x_dir=(1, 0, 0), z_dir=(0, 1, 0)).offset(MIRROR4_START)):
        with Locations((15.24, -38.795899868)):
            Circle(MIRROR4_3_OUTLINE_R)
        with Locations((15.24, -38.795899868)):
            Circle(MIRROR4_3_OUTLINE_R_2, mode=Mode.SUBTRACT)
    extrude(amount=MIRROR4_3_DEPTH)

    # Mirror4 4 outline → Mirror4 4 (add)
    with BuildSketch(Plane(origin=(0, 0, 0), x_dir=(1, 0, 0), z_dir=(0, 1, 0)).offset(MIRROR4_START_2)):
        with BuildLine():
            Line((19.304, -31.8109), (19.304, -51.241899868))
            ThreePointArc((19.304, -51.241899868), (18.783235857, -52.499135725), (17.526, -53.019899868))
            Line((17.526, -53.019899868), (-17.526, -53.019899868))
            ThreePointArc((-17.526, -53.019899868), (-18.783235857, -52.499135725), (-19.304, -51.241899868))
            Line((-19.304, -51.241899868), (-19.304, -31.8109))
            Line((-19.304, -31.8109), (-20.1168, -31.8109))
            Line((-20.1168, -31.8109), (-20.1168, -51.241899868))
            ThreePointArc((-20.1168, -51.241899868), (-19.357972249, -53.073872117), (-17.526, -53.832699868))
            Line((-17.526, -53.832699868), (17.526, -53.832699868))
            ThreePointArc((17.526, -53.832699868), (19.357972249, -53.073872117), (20.1168, -51.241899868))
            Line((20.1168, -51.241899868), (20.1168, -31.8109))
            Line((20.1168, -31.8109), (19.304, -31.8109))
        make_face()
    extrude(amount=MIRROR4_4_DEPTH)


solid = part.part
